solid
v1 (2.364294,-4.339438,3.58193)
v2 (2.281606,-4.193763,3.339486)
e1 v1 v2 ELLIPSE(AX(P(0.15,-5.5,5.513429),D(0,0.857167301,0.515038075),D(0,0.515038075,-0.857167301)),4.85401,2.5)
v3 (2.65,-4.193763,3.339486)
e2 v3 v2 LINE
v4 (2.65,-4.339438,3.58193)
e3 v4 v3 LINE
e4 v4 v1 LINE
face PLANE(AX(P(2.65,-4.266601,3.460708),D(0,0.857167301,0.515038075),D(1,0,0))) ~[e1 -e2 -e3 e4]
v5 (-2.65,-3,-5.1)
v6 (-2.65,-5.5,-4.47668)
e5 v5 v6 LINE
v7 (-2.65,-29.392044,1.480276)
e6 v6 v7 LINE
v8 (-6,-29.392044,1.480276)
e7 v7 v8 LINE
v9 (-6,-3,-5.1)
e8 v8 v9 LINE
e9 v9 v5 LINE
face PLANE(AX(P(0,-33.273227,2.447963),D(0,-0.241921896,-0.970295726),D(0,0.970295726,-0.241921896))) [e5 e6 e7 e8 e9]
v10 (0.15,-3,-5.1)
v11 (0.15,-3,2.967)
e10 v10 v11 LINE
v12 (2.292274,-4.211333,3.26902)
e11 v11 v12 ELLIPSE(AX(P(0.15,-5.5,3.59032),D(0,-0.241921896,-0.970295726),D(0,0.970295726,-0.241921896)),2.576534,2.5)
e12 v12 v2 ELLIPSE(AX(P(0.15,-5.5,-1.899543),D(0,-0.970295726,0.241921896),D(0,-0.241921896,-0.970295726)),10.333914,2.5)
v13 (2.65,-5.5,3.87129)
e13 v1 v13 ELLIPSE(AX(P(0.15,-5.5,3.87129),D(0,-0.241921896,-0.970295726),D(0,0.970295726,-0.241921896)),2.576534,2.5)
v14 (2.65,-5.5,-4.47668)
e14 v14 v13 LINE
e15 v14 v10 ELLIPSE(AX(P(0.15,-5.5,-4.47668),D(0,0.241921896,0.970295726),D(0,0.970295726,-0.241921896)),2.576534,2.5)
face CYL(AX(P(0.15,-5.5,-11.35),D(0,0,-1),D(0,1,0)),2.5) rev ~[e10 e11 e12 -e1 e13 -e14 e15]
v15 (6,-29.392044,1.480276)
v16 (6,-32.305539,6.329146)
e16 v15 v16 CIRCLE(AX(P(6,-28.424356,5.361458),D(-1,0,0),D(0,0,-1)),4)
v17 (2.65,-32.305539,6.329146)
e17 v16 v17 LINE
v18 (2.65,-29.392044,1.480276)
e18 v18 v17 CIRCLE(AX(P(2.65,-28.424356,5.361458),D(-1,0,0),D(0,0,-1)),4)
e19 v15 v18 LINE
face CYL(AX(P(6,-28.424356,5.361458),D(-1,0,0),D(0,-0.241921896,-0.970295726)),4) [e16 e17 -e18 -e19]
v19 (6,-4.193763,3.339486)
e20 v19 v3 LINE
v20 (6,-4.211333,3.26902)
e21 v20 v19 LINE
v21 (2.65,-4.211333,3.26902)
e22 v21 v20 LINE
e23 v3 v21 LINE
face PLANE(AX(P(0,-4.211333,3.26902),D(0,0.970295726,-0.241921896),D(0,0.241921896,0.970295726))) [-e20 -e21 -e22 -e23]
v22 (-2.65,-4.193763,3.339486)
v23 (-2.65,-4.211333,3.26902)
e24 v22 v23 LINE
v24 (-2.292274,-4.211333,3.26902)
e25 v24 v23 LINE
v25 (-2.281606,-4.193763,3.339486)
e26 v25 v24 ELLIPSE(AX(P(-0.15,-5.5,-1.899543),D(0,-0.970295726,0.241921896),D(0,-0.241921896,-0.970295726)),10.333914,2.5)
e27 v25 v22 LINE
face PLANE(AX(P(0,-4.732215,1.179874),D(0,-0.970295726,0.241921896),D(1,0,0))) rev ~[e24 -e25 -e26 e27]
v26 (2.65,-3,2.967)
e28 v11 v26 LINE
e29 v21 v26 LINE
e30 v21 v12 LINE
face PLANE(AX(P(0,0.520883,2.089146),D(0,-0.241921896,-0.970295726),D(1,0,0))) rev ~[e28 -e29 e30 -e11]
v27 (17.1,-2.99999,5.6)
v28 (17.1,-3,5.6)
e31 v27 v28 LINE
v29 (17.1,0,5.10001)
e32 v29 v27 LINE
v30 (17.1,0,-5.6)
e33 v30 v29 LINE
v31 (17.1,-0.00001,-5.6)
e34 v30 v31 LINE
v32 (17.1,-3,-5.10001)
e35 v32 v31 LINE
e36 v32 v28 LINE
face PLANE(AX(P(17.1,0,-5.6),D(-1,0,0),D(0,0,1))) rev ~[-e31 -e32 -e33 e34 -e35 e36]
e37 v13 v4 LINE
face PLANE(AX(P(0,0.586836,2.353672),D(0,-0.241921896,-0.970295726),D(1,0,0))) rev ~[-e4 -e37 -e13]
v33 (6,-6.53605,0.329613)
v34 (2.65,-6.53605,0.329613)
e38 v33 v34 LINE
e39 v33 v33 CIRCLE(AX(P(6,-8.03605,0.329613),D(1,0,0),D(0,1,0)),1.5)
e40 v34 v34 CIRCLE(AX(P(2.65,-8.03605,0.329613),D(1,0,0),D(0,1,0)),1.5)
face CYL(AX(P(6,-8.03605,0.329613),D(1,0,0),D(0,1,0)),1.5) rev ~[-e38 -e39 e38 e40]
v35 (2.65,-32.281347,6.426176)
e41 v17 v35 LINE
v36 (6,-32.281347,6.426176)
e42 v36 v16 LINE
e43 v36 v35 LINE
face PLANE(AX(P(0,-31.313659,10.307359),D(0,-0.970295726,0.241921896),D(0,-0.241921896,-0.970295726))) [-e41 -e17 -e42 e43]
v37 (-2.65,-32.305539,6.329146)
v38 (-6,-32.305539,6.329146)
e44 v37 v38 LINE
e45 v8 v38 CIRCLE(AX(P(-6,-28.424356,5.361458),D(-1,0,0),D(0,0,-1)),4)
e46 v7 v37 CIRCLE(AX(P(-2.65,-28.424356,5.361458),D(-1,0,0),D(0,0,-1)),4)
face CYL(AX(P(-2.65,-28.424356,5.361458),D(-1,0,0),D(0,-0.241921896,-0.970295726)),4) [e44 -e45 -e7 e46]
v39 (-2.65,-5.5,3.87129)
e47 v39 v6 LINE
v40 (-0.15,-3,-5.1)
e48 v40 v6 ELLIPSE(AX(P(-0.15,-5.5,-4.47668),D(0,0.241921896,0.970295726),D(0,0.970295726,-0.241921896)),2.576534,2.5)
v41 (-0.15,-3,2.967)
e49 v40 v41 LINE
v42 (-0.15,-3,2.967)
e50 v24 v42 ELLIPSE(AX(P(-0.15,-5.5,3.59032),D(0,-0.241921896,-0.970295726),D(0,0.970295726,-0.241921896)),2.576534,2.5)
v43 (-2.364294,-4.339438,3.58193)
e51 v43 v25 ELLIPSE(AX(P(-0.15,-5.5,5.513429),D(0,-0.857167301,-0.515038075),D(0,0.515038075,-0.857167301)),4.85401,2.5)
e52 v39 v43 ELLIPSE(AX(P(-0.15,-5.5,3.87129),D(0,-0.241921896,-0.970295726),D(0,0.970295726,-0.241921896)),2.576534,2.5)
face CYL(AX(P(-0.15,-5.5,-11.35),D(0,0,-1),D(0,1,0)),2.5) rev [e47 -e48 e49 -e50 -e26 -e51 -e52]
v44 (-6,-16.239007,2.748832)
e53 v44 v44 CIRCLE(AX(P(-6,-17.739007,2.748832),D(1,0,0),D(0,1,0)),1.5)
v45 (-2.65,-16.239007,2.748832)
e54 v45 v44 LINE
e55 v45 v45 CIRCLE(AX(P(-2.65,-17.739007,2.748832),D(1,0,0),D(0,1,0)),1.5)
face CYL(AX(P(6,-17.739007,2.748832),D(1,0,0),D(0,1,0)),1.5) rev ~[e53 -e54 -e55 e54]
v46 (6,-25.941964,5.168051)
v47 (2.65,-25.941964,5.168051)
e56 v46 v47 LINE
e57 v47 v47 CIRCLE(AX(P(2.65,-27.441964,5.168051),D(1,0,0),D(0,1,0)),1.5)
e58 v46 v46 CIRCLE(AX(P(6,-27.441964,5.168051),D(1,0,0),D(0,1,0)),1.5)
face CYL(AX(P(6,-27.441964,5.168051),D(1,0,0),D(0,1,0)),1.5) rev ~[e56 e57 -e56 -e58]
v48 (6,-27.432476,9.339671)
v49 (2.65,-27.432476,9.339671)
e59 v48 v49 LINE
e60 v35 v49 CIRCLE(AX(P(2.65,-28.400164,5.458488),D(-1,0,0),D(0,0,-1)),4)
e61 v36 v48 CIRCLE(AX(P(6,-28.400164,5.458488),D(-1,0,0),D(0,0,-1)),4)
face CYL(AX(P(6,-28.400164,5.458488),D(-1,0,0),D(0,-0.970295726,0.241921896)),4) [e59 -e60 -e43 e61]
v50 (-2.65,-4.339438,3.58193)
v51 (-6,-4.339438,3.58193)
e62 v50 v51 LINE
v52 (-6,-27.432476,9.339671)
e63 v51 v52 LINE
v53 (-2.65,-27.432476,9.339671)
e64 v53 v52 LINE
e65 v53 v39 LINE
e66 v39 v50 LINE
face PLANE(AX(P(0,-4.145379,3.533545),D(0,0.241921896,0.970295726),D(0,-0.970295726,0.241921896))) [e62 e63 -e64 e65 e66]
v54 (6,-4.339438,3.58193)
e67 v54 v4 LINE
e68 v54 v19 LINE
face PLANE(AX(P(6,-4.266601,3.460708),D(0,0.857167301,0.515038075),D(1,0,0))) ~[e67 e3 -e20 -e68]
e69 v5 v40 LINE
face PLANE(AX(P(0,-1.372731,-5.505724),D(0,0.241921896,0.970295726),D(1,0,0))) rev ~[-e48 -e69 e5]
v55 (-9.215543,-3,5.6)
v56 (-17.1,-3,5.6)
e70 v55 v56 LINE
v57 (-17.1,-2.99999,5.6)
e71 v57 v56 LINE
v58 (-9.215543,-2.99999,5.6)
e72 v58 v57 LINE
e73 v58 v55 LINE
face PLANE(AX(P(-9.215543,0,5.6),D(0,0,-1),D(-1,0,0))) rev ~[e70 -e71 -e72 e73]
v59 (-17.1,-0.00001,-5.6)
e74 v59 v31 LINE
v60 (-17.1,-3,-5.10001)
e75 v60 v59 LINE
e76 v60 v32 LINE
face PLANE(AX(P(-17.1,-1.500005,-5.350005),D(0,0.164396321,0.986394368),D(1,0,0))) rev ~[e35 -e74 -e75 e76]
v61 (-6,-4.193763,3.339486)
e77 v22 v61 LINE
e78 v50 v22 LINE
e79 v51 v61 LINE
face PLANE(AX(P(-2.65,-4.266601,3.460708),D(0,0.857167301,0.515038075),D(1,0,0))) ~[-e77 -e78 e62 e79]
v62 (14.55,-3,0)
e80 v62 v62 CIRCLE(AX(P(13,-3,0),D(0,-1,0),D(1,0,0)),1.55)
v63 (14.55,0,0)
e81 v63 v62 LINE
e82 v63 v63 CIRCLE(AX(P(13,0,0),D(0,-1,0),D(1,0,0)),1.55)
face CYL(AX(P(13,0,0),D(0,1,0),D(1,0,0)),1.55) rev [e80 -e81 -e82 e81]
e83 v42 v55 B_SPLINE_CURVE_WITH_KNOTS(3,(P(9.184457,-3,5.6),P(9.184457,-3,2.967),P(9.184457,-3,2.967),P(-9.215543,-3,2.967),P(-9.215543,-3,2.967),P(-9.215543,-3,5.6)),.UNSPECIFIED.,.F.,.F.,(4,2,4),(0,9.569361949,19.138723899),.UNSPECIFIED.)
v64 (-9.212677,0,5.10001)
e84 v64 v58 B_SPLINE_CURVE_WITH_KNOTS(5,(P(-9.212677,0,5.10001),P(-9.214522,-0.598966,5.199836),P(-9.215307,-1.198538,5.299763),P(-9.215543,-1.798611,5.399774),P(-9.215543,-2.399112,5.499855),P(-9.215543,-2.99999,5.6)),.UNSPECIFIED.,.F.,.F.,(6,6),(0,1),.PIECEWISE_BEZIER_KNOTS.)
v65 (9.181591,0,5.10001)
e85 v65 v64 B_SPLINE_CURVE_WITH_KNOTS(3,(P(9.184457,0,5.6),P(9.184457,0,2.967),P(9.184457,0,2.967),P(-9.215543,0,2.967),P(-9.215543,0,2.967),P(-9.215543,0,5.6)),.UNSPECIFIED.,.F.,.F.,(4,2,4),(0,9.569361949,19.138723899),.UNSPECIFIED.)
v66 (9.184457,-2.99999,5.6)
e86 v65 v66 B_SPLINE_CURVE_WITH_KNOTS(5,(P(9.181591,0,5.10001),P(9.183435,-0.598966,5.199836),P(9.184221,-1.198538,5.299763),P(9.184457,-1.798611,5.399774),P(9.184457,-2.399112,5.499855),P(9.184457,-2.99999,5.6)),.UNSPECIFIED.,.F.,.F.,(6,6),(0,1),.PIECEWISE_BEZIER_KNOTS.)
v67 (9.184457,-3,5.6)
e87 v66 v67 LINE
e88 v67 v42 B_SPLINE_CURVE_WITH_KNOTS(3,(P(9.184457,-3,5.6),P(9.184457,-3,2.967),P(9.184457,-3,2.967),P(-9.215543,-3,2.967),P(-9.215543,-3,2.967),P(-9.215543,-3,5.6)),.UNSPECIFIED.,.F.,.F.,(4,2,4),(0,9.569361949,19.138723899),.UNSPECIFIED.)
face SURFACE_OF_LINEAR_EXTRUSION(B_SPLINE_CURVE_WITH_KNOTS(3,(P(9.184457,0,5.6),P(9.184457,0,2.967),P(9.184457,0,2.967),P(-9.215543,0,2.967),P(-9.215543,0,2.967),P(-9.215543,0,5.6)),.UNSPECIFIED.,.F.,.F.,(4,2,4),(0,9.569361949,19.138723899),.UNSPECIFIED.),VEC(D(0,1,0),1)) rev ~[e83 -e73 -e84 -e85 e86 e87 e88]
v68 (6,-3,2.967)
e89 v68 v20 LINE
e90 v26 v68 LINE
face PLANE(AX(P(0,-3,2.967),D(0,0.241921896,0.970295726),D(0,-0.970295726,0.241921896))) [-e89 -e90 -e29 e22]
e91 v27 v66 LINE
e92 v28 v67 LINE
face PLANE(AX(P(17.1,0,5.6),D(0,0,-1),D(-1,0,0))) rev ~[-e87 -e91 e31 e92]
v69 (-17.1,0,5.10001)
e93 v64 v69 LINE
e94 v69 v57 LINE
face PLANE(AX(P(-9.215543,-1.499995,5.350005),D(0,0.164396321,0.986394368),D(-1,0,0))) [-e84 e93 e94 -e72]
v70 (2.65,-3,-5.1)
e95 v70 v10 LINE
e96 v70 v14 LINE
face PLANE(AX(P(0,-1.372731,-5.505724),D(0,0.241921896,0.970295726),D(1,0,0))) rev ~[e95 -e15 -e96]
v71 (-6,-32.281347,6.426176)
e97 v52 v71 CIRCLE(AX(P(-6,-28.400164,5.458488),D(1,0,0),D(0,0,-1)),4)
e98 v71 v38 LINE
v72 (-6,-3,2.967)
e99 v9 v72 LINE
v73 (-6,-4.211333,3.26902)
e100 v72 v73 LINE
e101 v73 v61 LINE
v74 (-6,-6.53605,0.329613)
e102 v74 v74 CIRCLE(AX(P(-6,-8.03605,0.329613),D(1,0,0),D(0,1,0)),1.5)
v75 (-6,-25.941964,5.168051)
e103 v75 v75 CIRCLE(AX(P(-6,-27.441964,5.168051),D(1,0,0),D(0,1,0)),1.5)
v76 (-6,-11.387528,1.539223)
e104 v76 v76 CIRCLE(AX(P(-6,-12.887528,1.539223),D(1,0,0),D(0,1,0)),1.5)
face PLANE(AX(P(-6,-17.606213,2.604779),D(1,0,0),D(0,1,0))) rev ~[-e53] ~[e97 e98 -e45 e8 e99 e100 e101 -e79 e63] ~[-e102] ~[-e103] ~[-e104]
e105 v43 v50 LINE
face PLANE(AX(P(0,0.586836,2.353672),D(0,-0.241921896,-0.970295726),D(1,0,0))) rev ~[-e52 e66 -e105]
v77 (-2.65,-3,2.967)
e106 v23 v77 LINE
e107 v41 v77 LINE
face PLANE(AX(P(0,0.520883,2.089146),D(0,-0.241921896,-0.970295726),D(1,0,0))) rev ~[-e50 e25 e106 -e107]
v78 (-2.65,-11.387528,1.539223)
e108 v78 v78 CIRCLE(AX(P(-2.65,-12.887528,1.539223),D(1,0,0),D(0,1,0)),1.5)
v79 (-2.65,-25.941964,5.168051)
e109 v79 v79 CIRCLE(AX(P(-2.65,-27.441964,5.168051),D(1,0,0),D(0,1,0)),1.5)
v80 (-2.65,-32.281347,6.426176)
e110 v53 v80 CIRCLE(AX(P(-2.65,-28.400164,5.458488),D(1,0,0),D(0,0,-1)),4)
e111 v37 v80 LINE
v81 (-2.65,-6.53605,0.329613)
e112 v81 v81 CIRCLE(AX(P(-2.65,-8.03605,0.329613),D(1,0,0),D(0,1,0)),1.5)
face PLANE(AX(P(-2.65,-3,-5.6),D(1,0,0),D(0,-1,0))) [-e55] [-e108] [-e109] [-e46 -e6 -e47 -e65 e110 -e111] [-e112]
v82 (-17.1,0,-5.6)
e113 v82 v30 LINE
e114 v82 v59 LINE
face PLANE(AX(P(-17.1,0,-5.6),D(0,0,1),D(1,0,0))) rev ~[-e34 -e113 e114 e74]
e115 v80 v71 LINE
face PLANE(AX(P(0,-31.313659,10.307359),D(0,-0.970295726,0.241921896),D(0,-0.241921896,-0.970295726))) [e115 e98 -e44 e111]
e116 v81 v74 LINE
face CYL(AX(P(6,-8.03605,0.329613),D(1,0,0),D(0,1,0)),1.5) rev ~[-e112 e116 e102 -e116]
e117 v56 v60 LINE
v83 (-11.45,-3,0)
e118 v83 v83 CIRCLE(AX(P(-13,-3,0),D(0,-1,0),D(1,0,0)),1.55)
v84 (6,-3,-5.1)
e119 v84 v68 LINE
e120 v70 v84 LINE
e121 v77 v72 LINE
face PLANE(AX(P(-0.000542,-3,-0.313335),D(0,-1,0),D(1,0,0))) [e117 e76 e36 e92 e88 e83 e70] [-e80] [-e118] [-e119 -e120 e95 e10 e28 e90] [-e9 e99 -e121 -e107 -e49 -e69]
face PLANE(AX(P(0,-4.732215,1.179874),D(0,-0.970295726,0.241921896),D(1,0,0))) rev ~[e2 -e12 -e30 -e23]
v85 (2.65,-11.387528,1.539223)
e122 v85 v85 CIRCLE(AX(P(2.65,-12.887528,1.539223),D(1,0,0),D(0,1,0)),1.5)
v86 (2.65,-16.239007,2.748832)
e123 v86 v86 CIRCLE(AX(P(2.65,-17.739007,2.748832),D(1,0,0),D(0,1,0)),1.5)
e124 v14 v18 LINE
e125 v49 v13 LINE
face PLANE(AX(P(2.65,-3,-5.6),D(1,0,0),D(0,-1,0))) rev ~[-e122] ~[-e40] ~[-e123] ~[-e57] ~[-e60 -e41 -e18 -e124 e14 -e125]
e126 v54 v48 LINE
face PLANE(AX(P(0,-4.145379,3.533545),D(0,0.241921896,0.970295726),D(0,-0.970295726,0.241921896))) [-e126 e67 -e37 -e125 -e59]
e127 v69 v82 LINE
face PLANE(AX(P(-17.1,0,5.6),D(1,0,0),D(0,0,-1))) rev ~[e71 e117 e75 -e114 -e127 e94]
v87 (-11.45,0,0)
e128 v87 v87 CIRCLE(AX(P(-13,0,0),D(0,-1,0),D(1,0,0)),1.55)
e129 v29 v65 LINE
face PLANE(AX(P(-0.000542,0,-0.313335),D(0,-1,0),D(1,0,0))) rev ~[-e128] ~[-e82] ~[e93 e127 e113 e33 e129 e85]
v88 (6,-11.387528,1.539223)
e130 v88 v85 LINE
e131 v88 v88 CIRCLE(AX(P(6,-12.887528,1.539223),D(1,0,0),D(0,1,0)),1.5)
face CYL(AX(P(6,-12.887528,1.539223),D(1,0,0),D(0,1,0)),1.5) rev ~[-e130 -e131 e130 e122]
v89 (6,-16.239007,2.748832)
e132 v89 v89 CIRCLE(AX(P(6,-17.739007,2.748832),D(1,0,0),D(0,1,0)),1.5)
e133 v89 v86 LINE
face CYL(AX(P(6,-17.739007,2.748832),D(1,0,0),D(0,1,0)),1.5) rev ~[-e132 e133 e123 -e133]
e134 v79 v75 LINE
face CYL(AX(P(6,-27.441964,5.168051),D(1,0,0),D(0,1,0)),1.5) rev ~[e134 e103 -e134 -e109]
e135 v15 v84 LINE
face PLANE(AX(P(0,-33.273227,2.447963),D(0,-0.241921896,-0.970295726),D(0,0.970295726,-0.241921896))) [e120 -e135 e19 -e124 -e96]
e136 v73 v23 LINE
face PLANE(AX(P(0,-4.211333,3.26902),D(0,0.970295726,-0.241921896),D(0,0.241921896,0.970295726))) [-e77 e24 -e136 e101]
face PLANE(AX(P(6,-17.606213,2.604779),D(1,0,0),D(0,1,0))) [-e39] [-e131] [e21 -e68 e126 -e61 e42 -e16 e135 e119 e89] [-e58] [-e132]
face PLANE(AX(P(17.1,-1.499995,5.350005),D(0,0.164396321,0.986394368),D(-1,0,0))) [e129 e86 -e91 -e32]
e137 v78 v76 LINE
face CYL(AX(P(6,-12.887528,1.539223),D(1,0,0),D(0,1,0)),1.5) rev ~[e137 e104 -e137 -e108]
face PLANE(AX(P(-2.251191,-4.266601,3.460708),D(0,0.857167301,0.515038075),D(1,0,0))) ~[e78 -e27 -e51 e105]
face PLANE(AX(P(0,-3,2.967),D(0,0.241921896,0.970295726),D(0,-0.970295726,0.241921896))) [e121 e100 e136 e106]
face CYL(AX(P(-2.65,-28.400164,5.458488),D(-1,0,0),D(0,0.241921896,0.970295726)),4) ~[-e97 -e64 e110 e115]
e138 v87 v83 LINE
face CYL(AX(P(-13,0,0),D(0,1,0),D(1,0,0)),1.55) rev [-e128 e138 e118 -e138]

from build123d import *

# Parameters (mm, degrees)
F0_R          = 1.55
F1_DEPTH      = 3
F2_SIZE2      = 2.99999
F2_SIZE       = 0.49999
F2_2_SIZE2    = 2.99999
F2_2_SIZE     = 0.49999
F4_DEPTH      = 6
F5_DEPTH      = 6
F6_R          = 1.5
F7_DEPTH      = 25
F9_W          = 5.3
F9_H          = 30.2732266598
F10_DEPTH     = 25
F11_R         = 4
F12_T4_DEPTH  = 20.5670004785
F12_T10_DEPTH = 20.5670004785
F12_T16_DEPTH = 20.5670004785
F12_T22_DEPTH = 20.5670004785
F13_SIZE      = 0.2


# Not quite as in the source:
# - a fillet or chamfer that OpenCascade refuses, or shapes differently, is made with other operations: its cross-section is extruded or revolved along the edge and cut away or added
# - a fillet or chamfer is up to 0.001 mm smaller than in the source, because OpenCascade refuses the exact size
# - ends of sketch curves that miss each other by under 0.0002 mm in the source are joined


with BuildPart() as f1:
    # F0 (on Front) → F1 (new body)
    with BuildSketch(Plane.XZ):
        with BuildLine():
            Line((-17.1, 5.6), (-17.1, -5.6))
            Line((-17.1, -5.6), (17.1, -5.6))
            Line((17.1, -5.6), (17.1, 5.6))
            Line((17.1, 5.6), (9.1844569534, 5.6))
            add(Edge.make_bspline(
                [(9.1844569534, 5.6), (9.1844569534, 2.9670004785), (9.1844569534, 2.9670004785), (-0.0155430466, 2.9670004785)],
                knots=[0, 0, 0, 0, 9.5693619495, 9.5693619495, 9.5693619495, 9.5693619495], degree=3))
            add(Edge.make_bspline(
                [(-9.2155430466, 5.6), (-9.2155430466, 2.9670004785), (-9.2155430466, 2.9670004785), (-0.0155430466, 2.9670004785)],
                knots=[0, 0, 0, 0, 9.5693618638, 9.5693618638, 9.5693618638, 9.5693618638], degree=3))
            Line((-9.2155430466, 5.6), (-17.1, 5.6))
        make_face()
        with Locations((-13, 0)):
            Circle(F0_R, mode=Mode.SUBTRACT)
        with Locations((13, 0)):
            Circle(F0_R, mode=Mode.SUBTRACT)
    extrude(amount=F1_DEPTH)

    # F2 (size 0.5 and 3 in the source; OpenCascade refuses exactly that, so slightly less here)
    f2_edges = [f1.edges().sort_by_distance(p)[0] for p in [
        (-13.157772, 0, 5.6),
        (13.142228, 0, 5.6),
    ]]
    f2_side = f1.faces().sort_by_distance((0.002222, 0, -0.619959))[0]
    chamfer(f2_edges, length=F2_SIZE, length2=F2_SIZE2, reference=f2_side)

    # F2#2 (size 0.5 and 3 in the source; OpenCascade refuses exactly that, so slightly less here)
    f2_2_edges = [f1.edges().sort_by_distance(p)[0] for p in [
        (0, -3, -5.6),
    ]]
    f2_2_side = f1.faces().sort_by_distance((0.002222, -3, -0.619959))[0]
    chamfer(f2_2_edges, length=F2_2_SIZE, length2=F2_2_SIZE2, reference=f2_2_side)

    # F3 (on Right) → F4 (join)
    with BuildSketch(Plane.YZ):
        Polygon((-33.2732266598, 2.4479631427), (-3, -5.1), (-3, 2.9670004785), (-4.2113326633, 3.2690196322), (-4.1453789697, 3.5335454488), (-31.3136593055, 10.3073585255), align=None)
    extrude(amount=F4_DEPTH)

    # F5 (add): a face of the model
    f5_faces = [f1.faces().sort_by_distance(p)[0] for p in [
        (0, -17.6712487641, 2.6798726591),
    ]]
    extrude(f5_faces, amount=F5_DEPTH)

    # F6 (on face) → F7 (cut)
    with BuildSketch(Plane.YZ.offset(6)):
        with Locations((-27.4419643513, 5.1680513561)):
            Circle(F6_R)
        with Locations((-17.7390070885, 2.7488324001)):
            Circle(F6_R)
        with Locations((-12.8875284571, 1.5392229221)):
            Circle(F6_R)
        with Locations((-8.0360498257, 0.3296134441)):
            Circle(F6_R)
    extrude(amount=-F7_DEPTH, mode=Mode.SUBTRACT)

    # F9 (on face) → F10 (cut)
    with BuildSketch(Plane(origin=(0, 0, -5.6), x_dir=(1, 0, 0), z_dir=(0, 0, -1))):
        with Locations((0, 18.1366133299)):
            Rectangle(F9_W, F9_H)
    extrude(amount=-F10_DEPTH, mode=Mode.SUBTRACT)

    # F11
    f11_edges = [f1.edges().sort_by_distance(p)[0] for p in [
        (-4.325, -33.273227, 2.447963),
        (4.325, -33.273227, 2.447963),
        (-4.325, -31.313659, 10.307359),
        (4.325, -31.313659, 10.307359),
    ]]
    fillet(f11_edges, radius=F11_R)

    # F12: fillet of radius 2.5 on 2 edges, made by hand


with BuildPart() as f12_tool2:
    # F12_s3 → F12_t4 (new body)
    with BuildSketch(Plane.XY.offset(-11.35)):
        with BuildLine():
            ThreePointArc((-0.15, -3), (-1.917766953, -3.732233047), (-2.65, -5.5))
            Line((-2.65, -5.5), (-2.65, -3))
            Line((-2.65, -3), (-0.15, -3))
        make_face()
    extrude(amount=F12_T4_DEPTH)

    split(bisect_by=Plane(origin=(0, 0.520882565, 2.0891458603), x_dir=(1, 0, 0), z_dir=(0, -0.2419218956, -0.9702957263)), keep=Keep.TOP)

    split(bisect_by=Plane(origin=(0, -1.3727310958, -5.505723706), x_dir=(1, 0, 0), z_dir=(0, 0.2419218956, 0.9702957263)), keep=Keep.TOP)


with BuildPart() as f1_1:
    add(f1.part)

    # F12_t1: union F12_tool2
    add(f12_tool2.part)


with BuildPart() as f12_tool8:
    # F12_s9 → F12_t10 (new body)
    with BuildSketch(Plane.XY.offset(-11.35)):
        with BuildLine():
            ThreePointArc((-0.15, -3), (-1.917766953, -3.732233047), (-2.65, -5.5))
            Line((-2.65, -5.5), (-2.65, -3))
            Line((-2.65, -3), (-0.15, -3))
        make_face()
    extrude(amount=F12_T10_DEPTH)

    split(bisect_by=Plane(origin=(0, -4.7322152283, 1.1798737719), x_dir=(1, 0, 0), z_dir=(0, -0.9702957263, 0.2419218956)), keep=Keep.TOP)

    split(bisect_by=Plane(origin=(0, 0.5868362585, 2.3536716769), x_dir=(1, 0, 0), z_dir=(0, -0.2419218956, -0.9702957263)), keep=Keep.TOP)


with BuildPart() as f1_2:
    add(f1_1.part)

    # F12_t7: union F12_tool8
    add(f12_tool8.part)


with BuildPart() as f12_tool14:
    # F12_s15 → F12_t16 (new body)
    with BuildSketch(Plane.XY.offset(-11.35)):
        with BuildLine():
            ThreePointArc((0.15, -3), (1.917766953, -3.732233047), (2.65, -5.5))
            Line((2.65, -5.5), (2.65, -3))
            Line((2.65, -3), (0.15, -3))
        make_face()
    extrude(amount=F12_T16_DEPTH)

    split(bisect_by=Plane(origin=(0, -1.3727310958, -5.505723706), x_dir=(1, 0, 0), z_dir=(0, 0.2419218956, 0.9702957263)), keep=Keep.TOP)

    split(bisect_by=Plane(origin=(0, 0.520882565, 2.0891458603), x_dir=(1, 0, 0), z_dir=(0, -0.2419218956, -0.9702957263)), keep=Keep.TOP)


with BuildPart() as f1_3:
    add(f1_2.part)

    # F12_t13: union F12_tool14
    add(f12_tool14.part)


with BuildPart() as f12_tool20:
    # F12_s21 → F12_t22 (new body)
    with BuildSketch(Plane.XY.offset(-11.35)):
        with BuildLine():
            ThreePointArc((0.15, -3), (1.917766953, -3.732233047), (2.65, -5.5))
            Line((2.65, -5.5), (2.65, -3))
            Line((2.65, -3), (0.15, -3))
        make_face()
    extrude(amount=F12_T22_DEPTH)

    split(bisect_by=Plane(origin=(0, -4.7322152283, 1.1798737719), x_dir=(1, 0, 0), z_dir=(0, -0.9702957263, 0.2419218956)), keep=Keep.TOP)

    split(bisect_by=Plane(origin=(0, 0.5868362585, 2.3536716769), x_dir=(1, 0, 0), z_dir=(0, -0.2419218956, -0.9702957263)), keep=Keep.TOP)


with BuildPart() as f1_4:
    add(f1_3.part)

    # F12_t19: union F12_tool20
    add(f12_tool20.part)

    # F13
    f13_edges = [f1_4.edges().sort_by_distance(p)[0] for p in [
        (4.125595, -4.145379, 3.533545),
        (-4.125595, -4.145379, 3.533545),
    ]]
    chamfer(f13_edges, length=F13_SIZE)


solid = f1_4.part
